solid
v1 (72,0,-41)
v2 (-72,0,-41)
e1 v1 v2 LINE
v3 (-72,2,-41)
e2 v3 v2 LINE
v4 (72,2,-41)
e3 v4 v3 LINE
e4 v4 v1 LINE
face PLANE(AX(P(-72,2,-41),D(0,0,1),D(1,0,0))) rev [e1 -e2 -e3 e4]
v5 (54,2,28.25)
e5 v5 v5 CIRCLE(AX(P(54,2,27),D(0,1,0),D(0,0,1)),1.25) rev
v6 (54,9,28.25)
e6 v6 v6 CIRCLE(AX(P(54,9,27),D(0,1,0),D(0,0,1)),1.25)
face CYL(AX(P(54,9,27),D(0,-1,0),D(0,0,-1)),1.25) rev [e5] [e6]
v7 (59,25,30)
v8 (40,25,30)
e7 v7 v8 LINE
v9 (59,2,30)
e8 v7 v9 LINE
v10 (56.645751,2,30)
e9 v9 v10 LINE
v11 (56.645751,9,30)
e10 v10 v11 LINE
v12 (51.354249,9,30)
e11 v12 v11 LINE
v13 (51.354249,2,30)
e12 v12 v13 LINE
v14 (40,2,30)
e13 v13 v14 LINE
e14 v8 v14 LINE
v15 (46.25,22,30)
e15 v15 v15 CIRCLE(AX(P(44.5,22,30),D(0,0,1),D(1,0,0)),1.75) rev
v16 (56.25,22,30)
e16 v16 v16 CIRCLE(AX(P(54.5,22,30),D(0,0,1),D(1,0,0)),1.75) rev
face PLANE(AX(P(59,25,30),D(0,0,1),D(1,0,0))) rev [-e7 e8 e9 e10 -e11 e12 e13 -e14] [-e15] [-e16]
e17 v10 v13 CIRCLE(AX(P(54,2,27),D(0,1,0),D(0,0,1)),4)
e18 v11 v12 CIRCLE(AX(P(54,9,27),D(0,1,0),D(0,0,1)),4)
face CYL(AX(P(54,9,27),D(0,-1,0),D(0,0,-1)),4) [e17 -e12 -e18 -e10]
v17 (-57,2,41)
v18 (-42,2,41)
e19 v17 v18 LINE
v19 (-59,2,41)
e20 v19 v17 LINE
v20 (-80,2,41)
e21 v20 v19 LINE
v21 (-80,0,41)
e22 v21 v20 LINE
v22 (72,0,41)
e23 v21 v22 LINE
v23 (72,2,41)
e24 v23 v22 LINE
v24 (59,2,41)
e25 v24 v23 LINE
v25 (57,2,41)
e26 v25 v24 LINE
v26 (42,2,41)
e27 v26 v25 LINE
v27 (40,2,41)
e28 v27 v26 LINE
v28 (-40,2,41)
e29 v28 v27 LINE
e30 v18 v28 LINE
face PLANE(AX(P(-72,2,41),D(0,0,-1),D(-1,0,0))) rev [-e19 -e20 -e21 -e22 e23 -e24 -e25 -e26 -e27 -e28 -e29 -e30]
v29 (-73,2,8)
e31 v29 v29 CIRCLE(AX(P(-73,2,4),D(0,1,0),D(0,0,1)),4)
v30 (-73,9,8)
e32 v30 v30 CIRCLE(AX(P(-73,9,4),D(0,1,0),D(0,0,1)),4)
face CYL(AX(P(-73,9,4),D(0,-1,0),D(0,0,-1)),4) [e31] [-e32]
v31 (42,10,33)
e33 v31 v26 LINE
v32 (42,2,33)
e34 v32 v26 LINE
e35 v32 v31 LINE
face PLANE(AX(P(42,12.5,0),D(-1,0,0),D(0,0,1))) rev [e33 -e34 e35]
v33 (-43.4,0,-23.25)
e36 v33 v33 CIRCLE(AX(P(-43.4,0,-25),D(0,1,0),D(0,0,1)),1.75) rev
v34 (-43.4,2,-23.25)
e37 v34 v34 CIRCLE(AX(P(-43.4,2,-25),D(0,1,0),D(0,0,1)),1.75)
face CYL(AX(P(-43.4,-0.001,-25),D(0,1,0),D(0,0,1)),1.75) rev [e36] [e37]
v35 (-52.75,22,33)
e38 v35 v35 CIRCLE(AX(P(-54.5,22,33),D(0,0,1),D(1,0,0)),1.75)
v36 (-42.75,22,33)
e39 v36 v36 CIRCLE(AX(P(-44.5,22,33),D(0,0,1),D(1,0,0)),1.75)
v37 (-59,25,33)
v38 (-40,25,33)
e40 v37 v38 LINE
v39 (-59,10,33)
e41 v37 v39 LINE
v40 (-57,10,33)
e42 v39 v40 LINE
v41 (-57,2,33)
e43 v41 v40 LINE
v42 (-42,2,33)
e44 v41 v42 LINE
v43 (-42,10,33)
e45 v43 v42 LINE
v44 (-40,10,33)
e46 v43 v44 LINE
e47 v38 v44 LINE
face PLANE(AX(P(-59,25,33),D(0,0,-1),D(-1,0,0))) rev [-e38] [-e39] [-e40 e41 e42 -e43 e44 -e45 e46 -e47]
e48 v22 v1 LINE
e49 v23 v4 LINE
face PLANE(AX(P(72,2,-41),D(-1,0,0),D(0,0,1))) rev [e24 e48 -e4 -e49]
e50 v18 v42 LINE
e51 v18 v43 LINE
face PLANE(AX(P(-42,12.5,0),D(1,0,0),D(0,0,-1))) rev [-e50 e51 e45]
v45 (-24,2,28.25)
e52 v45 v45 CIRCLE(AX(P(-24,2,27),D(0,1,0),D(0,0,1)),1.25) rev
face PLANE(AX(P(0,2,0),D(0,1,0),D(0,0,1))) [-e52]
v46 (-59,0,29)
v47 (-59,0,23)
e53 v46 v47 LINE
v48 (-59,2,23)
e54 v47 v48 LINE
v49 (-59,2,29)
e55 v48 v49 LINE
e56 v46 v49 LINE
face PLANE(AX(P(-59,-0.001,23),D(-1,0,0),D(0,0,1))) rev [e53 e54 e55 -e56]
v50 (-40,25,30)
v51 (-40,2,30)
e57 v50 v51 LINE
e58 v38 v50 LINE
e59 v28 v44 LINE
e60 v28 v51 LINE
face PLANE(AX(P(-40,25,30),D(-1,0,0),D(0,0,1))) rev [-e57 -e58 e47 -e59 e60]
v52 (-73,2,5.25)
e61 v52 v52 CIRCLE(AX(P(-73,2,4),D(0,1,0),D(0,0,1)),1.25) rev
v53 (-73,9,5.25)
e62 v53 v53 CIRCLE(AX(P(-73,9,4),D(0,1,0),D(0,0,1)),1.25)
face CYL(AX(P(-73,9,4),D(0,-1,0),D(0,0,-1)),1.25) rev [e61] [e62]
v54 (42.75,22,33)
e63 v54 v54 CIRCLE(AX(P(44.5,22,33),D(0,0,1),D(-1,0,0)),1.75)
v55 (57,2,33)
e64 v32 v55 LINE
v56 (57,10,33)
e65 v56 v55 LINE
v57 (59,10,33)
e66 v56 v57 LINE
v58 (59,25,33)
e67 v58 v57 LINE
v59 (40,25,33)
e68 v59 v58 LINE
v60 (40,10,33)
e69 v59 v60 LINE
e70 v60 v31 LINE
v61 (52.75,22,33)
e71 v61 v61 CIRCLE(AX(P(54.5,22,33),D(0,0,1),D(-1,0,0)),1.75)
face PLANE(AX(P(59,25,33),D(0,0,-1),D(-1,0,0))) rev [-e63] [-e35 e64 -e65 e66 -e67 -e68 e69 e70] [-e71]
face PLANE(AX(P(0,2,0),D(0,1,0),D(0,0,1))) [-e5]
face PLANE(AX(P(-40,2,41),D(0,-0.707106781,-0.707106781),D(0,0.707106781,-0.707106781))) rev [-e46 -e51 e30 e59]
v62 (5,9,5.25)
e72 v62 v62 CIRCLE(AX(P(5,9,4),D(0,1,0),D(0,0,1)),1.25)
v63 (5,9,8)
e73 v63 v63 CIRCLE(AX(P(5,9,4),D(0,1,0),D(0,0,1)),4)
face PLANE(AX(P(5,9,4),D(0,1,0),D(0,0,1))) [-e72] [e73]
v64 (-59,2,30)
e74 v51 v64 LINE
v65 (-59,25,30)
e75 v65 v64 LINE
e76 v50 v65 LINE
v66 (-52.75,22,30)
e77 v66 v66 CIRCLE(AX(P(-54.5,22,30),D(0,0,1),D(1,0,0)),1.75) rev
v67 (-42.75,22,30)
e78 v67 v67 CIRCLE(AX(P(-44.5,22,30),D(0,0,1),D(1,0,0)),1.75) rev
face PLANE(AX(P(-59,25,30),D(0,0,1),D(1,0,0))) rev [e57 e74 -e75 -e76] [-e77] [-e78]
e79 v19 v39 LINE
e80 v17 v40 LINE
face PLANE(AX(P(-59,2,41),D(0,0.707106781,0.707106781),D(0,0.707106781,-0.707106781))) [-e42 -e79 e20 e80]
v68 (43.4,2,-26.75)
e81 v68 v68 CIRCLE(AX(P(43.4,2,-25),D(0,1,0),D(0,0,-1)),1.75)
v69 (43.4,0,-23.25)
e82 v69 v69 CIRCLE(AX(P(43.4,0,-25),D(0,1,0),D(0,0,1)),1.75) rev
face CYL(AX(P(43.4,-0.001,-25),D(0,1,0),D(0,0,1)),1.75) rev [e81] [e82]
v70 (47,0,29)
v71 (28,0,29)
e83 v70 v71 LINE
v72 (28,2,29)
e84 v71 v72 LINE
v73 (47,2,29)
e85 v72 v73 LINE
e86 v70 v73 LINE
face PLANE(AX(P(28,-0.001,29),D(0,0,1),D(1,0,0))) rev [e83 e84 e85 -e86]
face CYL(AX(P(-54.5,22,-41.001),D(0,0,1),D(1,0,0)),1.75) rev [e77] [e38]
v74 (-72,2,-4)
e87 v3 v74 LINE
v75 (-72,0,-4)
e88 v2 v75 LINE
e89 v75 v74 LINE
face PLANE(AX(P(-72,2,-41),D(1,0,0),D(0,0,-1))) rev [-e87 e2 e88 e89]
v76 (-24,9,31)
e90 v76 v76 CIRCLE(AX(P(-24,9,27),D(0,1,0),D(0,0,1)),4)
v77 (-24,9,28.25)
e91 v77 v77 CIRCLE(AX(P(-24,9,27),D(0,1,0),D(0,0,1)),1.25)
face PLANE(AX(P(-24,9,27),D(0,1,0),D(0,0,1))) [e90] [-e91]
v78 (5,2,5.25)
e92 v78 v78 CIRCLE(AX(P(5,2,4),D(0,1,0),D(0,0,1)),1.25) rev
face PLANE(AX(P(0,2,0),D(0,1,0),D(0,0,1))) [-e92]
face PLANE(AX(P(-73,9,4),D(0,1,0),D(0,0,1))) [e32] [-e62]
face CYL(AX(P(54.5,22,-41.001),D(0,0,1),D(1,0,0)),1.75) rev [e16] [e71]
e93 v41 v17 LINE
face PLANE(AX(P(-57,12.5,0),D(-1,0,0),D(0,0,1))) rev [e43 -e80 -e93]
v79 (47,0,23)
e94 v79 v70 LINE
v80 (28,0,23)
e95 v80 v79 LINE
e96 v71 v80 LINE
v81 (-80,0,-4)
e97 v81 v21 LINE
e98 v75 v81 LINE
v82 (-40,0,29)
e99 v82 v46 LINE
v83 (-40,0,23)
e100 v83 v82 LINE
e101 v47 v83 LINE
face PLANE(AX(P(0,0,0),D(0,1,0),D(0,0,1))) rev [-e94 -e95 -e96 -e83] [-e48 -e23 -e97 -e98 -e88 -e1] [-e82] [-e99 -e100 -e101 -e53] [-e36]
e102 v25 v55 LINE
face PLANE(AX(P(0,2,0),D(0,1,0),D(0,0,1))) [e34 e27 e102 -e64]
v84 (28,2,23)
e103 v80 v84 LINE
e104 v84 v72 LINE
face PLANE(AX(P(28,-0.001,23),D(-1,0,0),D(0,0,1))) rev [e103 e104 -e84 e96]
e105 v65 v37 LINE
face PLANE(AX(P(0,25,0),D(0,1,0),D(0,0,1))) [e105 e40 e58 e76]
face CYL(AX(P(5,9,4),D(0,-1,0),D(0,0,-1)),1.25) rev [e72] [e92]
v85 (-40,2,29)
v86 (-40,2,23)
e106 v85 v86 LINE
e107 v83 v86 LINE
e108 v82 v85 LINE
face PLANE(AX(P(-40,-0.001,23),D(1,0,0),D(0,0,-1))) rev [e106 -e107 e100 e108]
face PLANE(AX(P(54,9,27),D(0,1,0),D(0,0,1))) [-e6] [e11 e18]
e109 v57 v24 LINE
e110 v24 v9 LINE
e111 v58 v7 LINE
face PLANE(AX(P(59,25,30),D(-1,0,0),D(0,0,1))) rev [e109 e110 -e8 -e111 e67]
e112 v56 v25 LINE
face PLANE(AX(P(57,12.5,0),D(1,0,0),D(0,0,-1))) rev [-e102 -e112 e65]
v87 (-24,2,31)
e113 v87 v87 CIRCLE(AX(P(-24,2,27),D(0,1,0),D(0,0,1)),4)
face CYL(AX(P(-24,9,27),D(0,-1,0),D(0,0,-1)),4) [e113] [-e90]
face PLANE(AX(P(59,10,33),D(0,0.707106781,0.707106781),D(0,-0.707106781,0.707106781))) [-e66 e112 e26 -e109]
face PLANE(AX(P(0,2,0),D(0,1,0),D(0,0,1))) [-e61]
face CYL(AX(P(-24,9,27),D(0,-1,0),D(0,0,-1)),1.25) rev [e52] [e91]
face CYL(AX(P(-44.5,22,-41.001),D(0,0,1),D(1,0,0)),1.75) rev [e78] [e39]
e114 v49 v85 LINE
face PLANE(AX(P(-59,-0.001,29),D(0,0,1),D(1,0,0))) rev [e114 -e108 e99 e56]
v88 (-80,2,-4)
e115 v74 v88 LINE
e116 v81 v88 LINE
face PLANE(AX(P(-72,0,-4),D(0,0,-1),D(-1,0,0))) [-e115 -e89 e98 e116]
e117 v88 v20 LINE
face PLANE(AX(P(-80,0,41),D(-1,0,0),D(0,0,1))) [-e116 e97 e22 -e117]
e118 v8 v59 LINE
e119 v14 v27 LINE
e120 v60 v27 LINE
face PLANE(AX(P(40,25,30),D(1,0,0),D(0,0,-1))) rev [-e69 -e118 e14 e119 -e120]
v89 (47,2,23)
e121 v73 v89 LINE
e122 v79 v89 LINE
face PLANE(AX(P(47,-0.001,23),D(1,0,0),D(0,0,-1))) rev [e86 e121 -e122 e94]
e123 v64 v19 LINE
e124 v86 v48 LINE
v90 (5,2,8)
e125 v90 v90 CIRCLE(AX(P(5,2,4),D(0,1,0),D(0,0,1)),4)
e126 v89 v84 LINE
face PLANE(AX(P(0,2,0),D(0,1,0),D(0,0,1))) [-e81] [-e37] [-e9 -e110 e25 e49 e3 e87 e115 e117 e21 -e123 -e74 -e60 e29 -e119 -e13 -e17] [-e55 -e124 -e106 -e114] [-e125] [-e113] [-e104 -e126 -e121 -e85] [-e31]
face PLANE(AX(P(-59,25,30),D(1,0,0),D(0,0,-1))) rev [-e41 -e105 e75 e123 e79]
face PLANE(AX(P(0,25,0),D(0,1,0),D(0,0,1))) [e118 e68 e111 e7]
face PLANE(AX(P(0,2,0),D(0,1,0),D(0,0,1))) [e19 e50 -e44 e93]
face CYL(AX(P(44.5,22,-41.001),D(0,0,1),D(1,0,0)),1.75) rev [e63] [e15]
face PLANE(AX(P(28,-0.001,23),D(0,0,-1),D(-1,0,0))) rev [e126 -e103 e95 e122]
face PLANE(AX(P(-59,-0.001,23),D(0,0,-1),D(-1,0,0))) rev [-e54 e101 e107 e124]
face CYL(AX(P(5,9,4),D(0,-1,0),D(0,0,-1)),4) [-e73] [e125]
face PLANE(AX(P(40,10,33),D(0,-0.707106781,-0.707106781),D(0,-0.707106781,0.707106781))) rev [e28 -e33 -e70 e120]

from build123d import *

# Parameters (mm, degrees)
CROQUIS1_W              = 144
CROQUIS1_H              = 82
SALIENTE_EXTRUIR1_DEPTH = 2
CROQUIS3_W              = 8
CROQUIS3_H              = 45
SALIENTE_EXTRUIR2_DEPTH = 2
CROQUIS2_R              = 4
CROQUIS2_R_2            = 1.25
SALIENTE_EXTRUIR3_DEPTH = 7
CORTAR_EXTRUIR1_REACH   = 92.167
CROQUIS4_W              = 19
CROQUIS4_H              = 6
CORTAR_EXTRUIR2_REACH   = 92.167
CROQUIS5_R              = 1.75
CROQUIS7_W              = 19
CROQUIS7_H              = 3
SALIENTE_EXTRUIR4_DEPTH = 23
CORTAR_EXTRUIR3_REACH   = 113.808
CROQUIS9_R              = 1.75
NERVIO1_REACH           = 141.524
CROQUIS10_WALL_W        = 292.3620914
CROQUIS10_WALL_H        = 2
NERVIO2_REACH           = 123.861
CROQUIS11_WALL_W        = 257.034860638
CROQUIS11_WALL_H        = 2
NERVIO3_REACH           = 149.061
CROQUIS12_WALL_W        = 307.43613199
CROQUIS12_WALL_H        = 2
NERVIO4_REACH           = 131.252
CROQUIS13_WALL_W        = 271.81709339
CROQUIS13_WALL_H        = 2


with BuildPart() as part:
    # Croquis1 → Saliente-Extruir1 (new body)
    with BuildSketch(Plane(origin=(0, 0, 0), x_dir=(1, 0, 0), z_dir=(0, 1, 0))):
        Rectangle(CROQUIS1_W, CROQUIS1_H)
    extrude(amount=SALIENTE_EXTRUIR1_DEPTH)

    # Croquis3 → Saliente-Extruir2 (add)
    with BuildSketch(Plane(origin=(0, 2, 0), x_dir=(1, 0, 0), z_dir=(0, 1, 0))):
        with Locations((-76, -18.5)):
            Rectangle(CROQUIS3_W, CROQUIS3_H)
    extrude(amount=-SALIENTE_EXTRUIR2_DEPTH)

    # Croquis2 → Saliente-Extruir3 (add)
    # profile 1 of 4: a face of its own
    with BuildSketch(Plane(origin=(0, 2, 0), x_dir=(1, 0, 0), z_dir=(0, 1, 0))):
        with Locations((54, -27)):
            Circle(CROQUIS2_R)
        with Locations((54, -27)):
            Circle(CROQUIS2_R_2, mode=Mode.SUBTRACT)
    # profile 2 of 4: a face of its own
    with BuildSketch(Plane(origin=(0, 2, 0), x_dir=(1, 0, 0), z_dir=(0, 1, 0))):
        with Locations((5, -4)):
            Circle(CROQUIS2_R)
        with Locations((5, -4)):
            Circle(CROQUIS2_R_2, mode=Mode.SUBTRACT)
    # profile 3 of 4: a face of its own
    with BuildSketch(Plane(origin=(0, 2, 0), x_dir=(1, 0, 0), z_dir=(0, 1, 0))):
        with Locations((-24, -27)):
            Circle(CROQUIS2_R)
        with Locations((-24, -27)):
            Circle(CROQUIS2_R_2, mode=Mode.SUBTRACT)
    # profile 4 of 4: a face of its own
    with BuildSketch(Plane(origin=(0, 2, 0), x_dir=(1, 0, 0), z_dir=(0, 1, 0))):
        with Locations((-73, -4)):
            Circle(CROQUIS2_R)
        with Locations((-73, -4)):
            Circle(CROQUIS2_R_2, mode=Mode.SUBTRACT)
    extrude(amount=SALIENTE_EXTRUIR3_DEPTH)

    # Croquis4 → Cortar-Extruir1 (cut, up to next)
    with BuildSketch(Plane(origin=(0, 2, 0), x_dir=(1, 0, 0), z_dir=(0, 1, 0)), mode=Mode.PRIVATE) as cortar_extruir1_sk1:
        with Locations((-49.5, -26)):
            Rectangle(CROQUIS4_W, CROQUIS4_H)
    cortar_extruir1_tool1 = extrude(cortar_extruir1_sk1.sketch, amount=-CORTAR_EXTRUIR1_REACH, mode=Mode.PRIVATE) & part.part
    # Croquis4 → Cortar-Extruir1 (cut, up to next)
    with BuildSketch(Plane(origin=(0, 2, 0), x_dir=(1, 0, 0), z_dir=(0, 1, 0)), mode=Mode.PRIVATE) as cortar_extruir1_sk2:
        with Locations((37.5, -26)):
            Rectangle(CROQUIS4_W, CROQUIS4_H)
    cortar_extruir1_tool2 = extrude(cortar_extruir1_sk2.sketch, amount=-CORTAR_EXTRUIR1_REACH, mode=Mode.PRIVATE) & part.part
    add(cortar_extruir1_tool1.solids().sort_by_distance((-49.5, 2, 26))[0], mode=Mode.SUBTRACT)
    add(cortar_extruir1_tool2.solids().sort_by_distance((37.5, 2, 26))[0], mode=Mode.SUBTRACT)

    # Croquis5 → Cortar-Extruir2 (cut, up to next)
    with BuildSketch(Plane(origin=(0, 2, 0), x_dir=(1, 0, 0), z_dir=(0, 1, 0)), mode=Mode.PRIVATE) as cortar_extruir2_sk1:
        with Locations((-43.4, 25)):
            Circle(CROQUIS5_R)
    cortar_extruir2_tool1 = extrude(cortar_extruir2_sk1.sketch, amount=-CORTAR_EXTRUIR2_REACH, mode=Mode.PRIVATE) & part.part
    # Croquis5 → Cortar-Extruir2 (cut, up to next)
    with BuildSketch(Plane(origin=(0, 2, 0), x_dir=(1, 0, 0), z_dir=(0, 1, 0)), mode=Mode.PRIVATE) as cortar_extruir2_sk2:
        with Locations((43.4, 25)):
            Circle(CROQUIS5_R)
    cortar_extruir2_tool2 = extrude(cortar_extruir2_sk2.sketch, amount=-CORTAR_EXTRUIR2_REACH, mode=Mode.PRIVATE) & part.part
    add(cortar_extruir2_tool1.solids().sort_by_distance((-43.4, 2, -25))[0], mode=Mode.SUBTRACT)
    add(cortar_extruir2_tool2.solids().sort_by_distance((43.4, 2, -25))[0], mode=Mode.SUBTRACT)

    # Croquis7 → Saliente-Extruir4 (add)
    with BuildSketch(Plane(origin=(0, 2, 0), x_dir=(1, 0, 0), z_dir=(0, 1, 0))):
        with Locations((-49.5, -31.5)):
            Rectangle(CROQUIS7_W, CROQUIS7_H)
        with Locations((49.5, -31.5)):
            Rectangle(CROQUIS7_W, CROQUIS7_H)
    extrude(amount=SALIENTE_EXTRUIR4_DEPTH)

    # Croquis9 → Cortar-Extruir3 (cut, up to next)
    with BuildSketch(Plane.XY.offset(33), mode=Mode.PRIVATE) as cortar_extruir3_sk1:
        with Locations((-54.5, 22)):
            Circle(CROQUIS9_R)
    cortar_extruir3_tool1 = extrude(cortar_extruir3_sk1.sketch, amount=-CORTAR_EXTRUIR3_REACH, mode=Mode.PRIVATE) & part.part
    # Croquis9 → Cortar-Extruir3 (cut, up to next)
    with BuildSketch(Plane.XY.offset(33), mode=Mode.PRIVATE) as cortar_extruir3_sk2:
        with Locations((-44.5, 22)):
            Circle(CROQUIS9_R)
    cortar_extruir3_tool2 = extrude(cortar_extruir3_sk2.sketch, amount=-CORTAR_EXTRUIR3_REACH, mode=Mode.PRIVATE) & part.part
    # Croquis9 → Cortar-Extruir3 (cut, up to next)
    with BuildSketch(Plane.XY.offset(33), mode=Mode.PRIVATE) as cortar_extruir3_sk3:
        with Locations((44.5, 22)):
            Circle(CROQUIS9_R)
    cortar_extruir3_tool3 = extrude(cortar_extruir3_sk3.sketch, amount=-CORTAR_EXTRUIR3_REACH, mode=Mode.PRIVATE) & part.part
    # Croquis9 → Cortar-Extruir3 (cut, up to next)
    with BuildSketch(Plane.XY.offset(33), mode=Mode.PRIVATE) as cortar_extruir3_sk4:
        with Locations((54.5, 22)):
            Circle(CROQUIS9_R)
    cortar_extruir3_tool4 = extrude(cortar_extruir3_sk4.sketch, amount=-CORTAR_EXTRUIR3_REACH, mode=Mode.PRIVATE) & part.part
    add(cortar_extruir3_tool1.solids().sort_by_distance((-54.5, 22, 33))[0], mode=Mode.SUBTRACT)
    add(cortar_extruir3_tool2.solids().sort_by_distance((-44.5, 22, 33))[0], mode=Mode.SUBTRACT)
    add(cortar_extruir3_tool3.solids().sort_by_distance((44.5, 22, 33))[0], mode=Mode.SUBTRACT)
    add(cortar_extruir3_tool4.solids().sort_by_distance((54.5, 22, 33))[0], mode=Mode.SUBTRACT)

    # Croquis10 wall → Nervio1 (add, up to next)
    with BuildSketch(Plane(origin=(-59, 6, 37), x_dir=(0, 0.707106781187, -0.707106781187), z_dir=(0, -0.707106781187, -0.707106781187)), mode=Mode.PRIVATE) as nervio1_sk1:
        with Locations((0, 1)):
            Rectangle(CROQUIS10_WALL_W, CROQUIS10_WALL_H)
    nervio1_tool1 = extrude(nervio1_sk1.sketch, amount=NERVIO1_REACH, mode=Mode.PRIVATE) - part.part
    add(nervio1_tool1.solids().sort_by_distance((-59, 6, 37))[0])

    # Croquis11 wall → Nervio2 (add, up to next)
    with BuildSketch(Plane(origin=(-40, 6, 37), x_dir=(0, 0.707106781187, -0.707106781187), z_dir=(0, 0.707106781187, 0.707106781187)), mode=Mode.PRIVATE) as nervio2_sk1:
        with Locations((0, 1)):
            Rectangle(CROQUIS11_WALL_W, CROQUIS11_WALL_H)
    nervio2_tool1 = extrude(nervio2_sk1.sketch, amount=-NERVIO2_REACH, mode=Mode.PRIVATE) - part.part
    add(nervio2_tool1.solids().sort_by_distance((-40, 6, 37))[0])

    # Croquis12 wall → Nervio3 (add, up to next)
    with BuildSketch(Plane(origin=(59, 6, 37), x_dir=(0, -0.707106781187, 0.707106781187), z_dir=(0, -0.707106781187, -0.707106781187)), mode=Mode.PRIVATE) as nervio3_sk1:
        with Locations((0, 1)):
            Rectangle(CROQUIS12_WALL_W, CROQUIS12_WALL_H)
    nervio3_tool1 = extrude(nervio3_sk1.sketch, amount=NERVIO3_REACH, mode=Mode.PRIVATE) - part.part
    add(nervio3_tool1.solids().sort_by_distance((59, 6, 37))[0])

    # Croquis13 wall → Nervio4 (add, up to next)
    with BuildSketch(Plane(origin=(40, 6, 37), x_dir=(0, -0.707106781187, 0.707106781187), z_dir=(0, 0.707106781187, 0.707106781187)), mode=Mode.PRIVATE) as nervio4_sk1:
        with Locations((0, 1)):
            Rectangle(CROQUIS13_WALL_W, CROQUIS13_WALL_H)
    nervio4_tool1 = extrude(nervio4_sk1.sketch, amount=-NERVIO4_REACH, mode=Mode.PRIVATE) - part.part
    add(nervio4_tool1.solids().sort_by_distance((40, 6, 37))[0])


solid = part.part
